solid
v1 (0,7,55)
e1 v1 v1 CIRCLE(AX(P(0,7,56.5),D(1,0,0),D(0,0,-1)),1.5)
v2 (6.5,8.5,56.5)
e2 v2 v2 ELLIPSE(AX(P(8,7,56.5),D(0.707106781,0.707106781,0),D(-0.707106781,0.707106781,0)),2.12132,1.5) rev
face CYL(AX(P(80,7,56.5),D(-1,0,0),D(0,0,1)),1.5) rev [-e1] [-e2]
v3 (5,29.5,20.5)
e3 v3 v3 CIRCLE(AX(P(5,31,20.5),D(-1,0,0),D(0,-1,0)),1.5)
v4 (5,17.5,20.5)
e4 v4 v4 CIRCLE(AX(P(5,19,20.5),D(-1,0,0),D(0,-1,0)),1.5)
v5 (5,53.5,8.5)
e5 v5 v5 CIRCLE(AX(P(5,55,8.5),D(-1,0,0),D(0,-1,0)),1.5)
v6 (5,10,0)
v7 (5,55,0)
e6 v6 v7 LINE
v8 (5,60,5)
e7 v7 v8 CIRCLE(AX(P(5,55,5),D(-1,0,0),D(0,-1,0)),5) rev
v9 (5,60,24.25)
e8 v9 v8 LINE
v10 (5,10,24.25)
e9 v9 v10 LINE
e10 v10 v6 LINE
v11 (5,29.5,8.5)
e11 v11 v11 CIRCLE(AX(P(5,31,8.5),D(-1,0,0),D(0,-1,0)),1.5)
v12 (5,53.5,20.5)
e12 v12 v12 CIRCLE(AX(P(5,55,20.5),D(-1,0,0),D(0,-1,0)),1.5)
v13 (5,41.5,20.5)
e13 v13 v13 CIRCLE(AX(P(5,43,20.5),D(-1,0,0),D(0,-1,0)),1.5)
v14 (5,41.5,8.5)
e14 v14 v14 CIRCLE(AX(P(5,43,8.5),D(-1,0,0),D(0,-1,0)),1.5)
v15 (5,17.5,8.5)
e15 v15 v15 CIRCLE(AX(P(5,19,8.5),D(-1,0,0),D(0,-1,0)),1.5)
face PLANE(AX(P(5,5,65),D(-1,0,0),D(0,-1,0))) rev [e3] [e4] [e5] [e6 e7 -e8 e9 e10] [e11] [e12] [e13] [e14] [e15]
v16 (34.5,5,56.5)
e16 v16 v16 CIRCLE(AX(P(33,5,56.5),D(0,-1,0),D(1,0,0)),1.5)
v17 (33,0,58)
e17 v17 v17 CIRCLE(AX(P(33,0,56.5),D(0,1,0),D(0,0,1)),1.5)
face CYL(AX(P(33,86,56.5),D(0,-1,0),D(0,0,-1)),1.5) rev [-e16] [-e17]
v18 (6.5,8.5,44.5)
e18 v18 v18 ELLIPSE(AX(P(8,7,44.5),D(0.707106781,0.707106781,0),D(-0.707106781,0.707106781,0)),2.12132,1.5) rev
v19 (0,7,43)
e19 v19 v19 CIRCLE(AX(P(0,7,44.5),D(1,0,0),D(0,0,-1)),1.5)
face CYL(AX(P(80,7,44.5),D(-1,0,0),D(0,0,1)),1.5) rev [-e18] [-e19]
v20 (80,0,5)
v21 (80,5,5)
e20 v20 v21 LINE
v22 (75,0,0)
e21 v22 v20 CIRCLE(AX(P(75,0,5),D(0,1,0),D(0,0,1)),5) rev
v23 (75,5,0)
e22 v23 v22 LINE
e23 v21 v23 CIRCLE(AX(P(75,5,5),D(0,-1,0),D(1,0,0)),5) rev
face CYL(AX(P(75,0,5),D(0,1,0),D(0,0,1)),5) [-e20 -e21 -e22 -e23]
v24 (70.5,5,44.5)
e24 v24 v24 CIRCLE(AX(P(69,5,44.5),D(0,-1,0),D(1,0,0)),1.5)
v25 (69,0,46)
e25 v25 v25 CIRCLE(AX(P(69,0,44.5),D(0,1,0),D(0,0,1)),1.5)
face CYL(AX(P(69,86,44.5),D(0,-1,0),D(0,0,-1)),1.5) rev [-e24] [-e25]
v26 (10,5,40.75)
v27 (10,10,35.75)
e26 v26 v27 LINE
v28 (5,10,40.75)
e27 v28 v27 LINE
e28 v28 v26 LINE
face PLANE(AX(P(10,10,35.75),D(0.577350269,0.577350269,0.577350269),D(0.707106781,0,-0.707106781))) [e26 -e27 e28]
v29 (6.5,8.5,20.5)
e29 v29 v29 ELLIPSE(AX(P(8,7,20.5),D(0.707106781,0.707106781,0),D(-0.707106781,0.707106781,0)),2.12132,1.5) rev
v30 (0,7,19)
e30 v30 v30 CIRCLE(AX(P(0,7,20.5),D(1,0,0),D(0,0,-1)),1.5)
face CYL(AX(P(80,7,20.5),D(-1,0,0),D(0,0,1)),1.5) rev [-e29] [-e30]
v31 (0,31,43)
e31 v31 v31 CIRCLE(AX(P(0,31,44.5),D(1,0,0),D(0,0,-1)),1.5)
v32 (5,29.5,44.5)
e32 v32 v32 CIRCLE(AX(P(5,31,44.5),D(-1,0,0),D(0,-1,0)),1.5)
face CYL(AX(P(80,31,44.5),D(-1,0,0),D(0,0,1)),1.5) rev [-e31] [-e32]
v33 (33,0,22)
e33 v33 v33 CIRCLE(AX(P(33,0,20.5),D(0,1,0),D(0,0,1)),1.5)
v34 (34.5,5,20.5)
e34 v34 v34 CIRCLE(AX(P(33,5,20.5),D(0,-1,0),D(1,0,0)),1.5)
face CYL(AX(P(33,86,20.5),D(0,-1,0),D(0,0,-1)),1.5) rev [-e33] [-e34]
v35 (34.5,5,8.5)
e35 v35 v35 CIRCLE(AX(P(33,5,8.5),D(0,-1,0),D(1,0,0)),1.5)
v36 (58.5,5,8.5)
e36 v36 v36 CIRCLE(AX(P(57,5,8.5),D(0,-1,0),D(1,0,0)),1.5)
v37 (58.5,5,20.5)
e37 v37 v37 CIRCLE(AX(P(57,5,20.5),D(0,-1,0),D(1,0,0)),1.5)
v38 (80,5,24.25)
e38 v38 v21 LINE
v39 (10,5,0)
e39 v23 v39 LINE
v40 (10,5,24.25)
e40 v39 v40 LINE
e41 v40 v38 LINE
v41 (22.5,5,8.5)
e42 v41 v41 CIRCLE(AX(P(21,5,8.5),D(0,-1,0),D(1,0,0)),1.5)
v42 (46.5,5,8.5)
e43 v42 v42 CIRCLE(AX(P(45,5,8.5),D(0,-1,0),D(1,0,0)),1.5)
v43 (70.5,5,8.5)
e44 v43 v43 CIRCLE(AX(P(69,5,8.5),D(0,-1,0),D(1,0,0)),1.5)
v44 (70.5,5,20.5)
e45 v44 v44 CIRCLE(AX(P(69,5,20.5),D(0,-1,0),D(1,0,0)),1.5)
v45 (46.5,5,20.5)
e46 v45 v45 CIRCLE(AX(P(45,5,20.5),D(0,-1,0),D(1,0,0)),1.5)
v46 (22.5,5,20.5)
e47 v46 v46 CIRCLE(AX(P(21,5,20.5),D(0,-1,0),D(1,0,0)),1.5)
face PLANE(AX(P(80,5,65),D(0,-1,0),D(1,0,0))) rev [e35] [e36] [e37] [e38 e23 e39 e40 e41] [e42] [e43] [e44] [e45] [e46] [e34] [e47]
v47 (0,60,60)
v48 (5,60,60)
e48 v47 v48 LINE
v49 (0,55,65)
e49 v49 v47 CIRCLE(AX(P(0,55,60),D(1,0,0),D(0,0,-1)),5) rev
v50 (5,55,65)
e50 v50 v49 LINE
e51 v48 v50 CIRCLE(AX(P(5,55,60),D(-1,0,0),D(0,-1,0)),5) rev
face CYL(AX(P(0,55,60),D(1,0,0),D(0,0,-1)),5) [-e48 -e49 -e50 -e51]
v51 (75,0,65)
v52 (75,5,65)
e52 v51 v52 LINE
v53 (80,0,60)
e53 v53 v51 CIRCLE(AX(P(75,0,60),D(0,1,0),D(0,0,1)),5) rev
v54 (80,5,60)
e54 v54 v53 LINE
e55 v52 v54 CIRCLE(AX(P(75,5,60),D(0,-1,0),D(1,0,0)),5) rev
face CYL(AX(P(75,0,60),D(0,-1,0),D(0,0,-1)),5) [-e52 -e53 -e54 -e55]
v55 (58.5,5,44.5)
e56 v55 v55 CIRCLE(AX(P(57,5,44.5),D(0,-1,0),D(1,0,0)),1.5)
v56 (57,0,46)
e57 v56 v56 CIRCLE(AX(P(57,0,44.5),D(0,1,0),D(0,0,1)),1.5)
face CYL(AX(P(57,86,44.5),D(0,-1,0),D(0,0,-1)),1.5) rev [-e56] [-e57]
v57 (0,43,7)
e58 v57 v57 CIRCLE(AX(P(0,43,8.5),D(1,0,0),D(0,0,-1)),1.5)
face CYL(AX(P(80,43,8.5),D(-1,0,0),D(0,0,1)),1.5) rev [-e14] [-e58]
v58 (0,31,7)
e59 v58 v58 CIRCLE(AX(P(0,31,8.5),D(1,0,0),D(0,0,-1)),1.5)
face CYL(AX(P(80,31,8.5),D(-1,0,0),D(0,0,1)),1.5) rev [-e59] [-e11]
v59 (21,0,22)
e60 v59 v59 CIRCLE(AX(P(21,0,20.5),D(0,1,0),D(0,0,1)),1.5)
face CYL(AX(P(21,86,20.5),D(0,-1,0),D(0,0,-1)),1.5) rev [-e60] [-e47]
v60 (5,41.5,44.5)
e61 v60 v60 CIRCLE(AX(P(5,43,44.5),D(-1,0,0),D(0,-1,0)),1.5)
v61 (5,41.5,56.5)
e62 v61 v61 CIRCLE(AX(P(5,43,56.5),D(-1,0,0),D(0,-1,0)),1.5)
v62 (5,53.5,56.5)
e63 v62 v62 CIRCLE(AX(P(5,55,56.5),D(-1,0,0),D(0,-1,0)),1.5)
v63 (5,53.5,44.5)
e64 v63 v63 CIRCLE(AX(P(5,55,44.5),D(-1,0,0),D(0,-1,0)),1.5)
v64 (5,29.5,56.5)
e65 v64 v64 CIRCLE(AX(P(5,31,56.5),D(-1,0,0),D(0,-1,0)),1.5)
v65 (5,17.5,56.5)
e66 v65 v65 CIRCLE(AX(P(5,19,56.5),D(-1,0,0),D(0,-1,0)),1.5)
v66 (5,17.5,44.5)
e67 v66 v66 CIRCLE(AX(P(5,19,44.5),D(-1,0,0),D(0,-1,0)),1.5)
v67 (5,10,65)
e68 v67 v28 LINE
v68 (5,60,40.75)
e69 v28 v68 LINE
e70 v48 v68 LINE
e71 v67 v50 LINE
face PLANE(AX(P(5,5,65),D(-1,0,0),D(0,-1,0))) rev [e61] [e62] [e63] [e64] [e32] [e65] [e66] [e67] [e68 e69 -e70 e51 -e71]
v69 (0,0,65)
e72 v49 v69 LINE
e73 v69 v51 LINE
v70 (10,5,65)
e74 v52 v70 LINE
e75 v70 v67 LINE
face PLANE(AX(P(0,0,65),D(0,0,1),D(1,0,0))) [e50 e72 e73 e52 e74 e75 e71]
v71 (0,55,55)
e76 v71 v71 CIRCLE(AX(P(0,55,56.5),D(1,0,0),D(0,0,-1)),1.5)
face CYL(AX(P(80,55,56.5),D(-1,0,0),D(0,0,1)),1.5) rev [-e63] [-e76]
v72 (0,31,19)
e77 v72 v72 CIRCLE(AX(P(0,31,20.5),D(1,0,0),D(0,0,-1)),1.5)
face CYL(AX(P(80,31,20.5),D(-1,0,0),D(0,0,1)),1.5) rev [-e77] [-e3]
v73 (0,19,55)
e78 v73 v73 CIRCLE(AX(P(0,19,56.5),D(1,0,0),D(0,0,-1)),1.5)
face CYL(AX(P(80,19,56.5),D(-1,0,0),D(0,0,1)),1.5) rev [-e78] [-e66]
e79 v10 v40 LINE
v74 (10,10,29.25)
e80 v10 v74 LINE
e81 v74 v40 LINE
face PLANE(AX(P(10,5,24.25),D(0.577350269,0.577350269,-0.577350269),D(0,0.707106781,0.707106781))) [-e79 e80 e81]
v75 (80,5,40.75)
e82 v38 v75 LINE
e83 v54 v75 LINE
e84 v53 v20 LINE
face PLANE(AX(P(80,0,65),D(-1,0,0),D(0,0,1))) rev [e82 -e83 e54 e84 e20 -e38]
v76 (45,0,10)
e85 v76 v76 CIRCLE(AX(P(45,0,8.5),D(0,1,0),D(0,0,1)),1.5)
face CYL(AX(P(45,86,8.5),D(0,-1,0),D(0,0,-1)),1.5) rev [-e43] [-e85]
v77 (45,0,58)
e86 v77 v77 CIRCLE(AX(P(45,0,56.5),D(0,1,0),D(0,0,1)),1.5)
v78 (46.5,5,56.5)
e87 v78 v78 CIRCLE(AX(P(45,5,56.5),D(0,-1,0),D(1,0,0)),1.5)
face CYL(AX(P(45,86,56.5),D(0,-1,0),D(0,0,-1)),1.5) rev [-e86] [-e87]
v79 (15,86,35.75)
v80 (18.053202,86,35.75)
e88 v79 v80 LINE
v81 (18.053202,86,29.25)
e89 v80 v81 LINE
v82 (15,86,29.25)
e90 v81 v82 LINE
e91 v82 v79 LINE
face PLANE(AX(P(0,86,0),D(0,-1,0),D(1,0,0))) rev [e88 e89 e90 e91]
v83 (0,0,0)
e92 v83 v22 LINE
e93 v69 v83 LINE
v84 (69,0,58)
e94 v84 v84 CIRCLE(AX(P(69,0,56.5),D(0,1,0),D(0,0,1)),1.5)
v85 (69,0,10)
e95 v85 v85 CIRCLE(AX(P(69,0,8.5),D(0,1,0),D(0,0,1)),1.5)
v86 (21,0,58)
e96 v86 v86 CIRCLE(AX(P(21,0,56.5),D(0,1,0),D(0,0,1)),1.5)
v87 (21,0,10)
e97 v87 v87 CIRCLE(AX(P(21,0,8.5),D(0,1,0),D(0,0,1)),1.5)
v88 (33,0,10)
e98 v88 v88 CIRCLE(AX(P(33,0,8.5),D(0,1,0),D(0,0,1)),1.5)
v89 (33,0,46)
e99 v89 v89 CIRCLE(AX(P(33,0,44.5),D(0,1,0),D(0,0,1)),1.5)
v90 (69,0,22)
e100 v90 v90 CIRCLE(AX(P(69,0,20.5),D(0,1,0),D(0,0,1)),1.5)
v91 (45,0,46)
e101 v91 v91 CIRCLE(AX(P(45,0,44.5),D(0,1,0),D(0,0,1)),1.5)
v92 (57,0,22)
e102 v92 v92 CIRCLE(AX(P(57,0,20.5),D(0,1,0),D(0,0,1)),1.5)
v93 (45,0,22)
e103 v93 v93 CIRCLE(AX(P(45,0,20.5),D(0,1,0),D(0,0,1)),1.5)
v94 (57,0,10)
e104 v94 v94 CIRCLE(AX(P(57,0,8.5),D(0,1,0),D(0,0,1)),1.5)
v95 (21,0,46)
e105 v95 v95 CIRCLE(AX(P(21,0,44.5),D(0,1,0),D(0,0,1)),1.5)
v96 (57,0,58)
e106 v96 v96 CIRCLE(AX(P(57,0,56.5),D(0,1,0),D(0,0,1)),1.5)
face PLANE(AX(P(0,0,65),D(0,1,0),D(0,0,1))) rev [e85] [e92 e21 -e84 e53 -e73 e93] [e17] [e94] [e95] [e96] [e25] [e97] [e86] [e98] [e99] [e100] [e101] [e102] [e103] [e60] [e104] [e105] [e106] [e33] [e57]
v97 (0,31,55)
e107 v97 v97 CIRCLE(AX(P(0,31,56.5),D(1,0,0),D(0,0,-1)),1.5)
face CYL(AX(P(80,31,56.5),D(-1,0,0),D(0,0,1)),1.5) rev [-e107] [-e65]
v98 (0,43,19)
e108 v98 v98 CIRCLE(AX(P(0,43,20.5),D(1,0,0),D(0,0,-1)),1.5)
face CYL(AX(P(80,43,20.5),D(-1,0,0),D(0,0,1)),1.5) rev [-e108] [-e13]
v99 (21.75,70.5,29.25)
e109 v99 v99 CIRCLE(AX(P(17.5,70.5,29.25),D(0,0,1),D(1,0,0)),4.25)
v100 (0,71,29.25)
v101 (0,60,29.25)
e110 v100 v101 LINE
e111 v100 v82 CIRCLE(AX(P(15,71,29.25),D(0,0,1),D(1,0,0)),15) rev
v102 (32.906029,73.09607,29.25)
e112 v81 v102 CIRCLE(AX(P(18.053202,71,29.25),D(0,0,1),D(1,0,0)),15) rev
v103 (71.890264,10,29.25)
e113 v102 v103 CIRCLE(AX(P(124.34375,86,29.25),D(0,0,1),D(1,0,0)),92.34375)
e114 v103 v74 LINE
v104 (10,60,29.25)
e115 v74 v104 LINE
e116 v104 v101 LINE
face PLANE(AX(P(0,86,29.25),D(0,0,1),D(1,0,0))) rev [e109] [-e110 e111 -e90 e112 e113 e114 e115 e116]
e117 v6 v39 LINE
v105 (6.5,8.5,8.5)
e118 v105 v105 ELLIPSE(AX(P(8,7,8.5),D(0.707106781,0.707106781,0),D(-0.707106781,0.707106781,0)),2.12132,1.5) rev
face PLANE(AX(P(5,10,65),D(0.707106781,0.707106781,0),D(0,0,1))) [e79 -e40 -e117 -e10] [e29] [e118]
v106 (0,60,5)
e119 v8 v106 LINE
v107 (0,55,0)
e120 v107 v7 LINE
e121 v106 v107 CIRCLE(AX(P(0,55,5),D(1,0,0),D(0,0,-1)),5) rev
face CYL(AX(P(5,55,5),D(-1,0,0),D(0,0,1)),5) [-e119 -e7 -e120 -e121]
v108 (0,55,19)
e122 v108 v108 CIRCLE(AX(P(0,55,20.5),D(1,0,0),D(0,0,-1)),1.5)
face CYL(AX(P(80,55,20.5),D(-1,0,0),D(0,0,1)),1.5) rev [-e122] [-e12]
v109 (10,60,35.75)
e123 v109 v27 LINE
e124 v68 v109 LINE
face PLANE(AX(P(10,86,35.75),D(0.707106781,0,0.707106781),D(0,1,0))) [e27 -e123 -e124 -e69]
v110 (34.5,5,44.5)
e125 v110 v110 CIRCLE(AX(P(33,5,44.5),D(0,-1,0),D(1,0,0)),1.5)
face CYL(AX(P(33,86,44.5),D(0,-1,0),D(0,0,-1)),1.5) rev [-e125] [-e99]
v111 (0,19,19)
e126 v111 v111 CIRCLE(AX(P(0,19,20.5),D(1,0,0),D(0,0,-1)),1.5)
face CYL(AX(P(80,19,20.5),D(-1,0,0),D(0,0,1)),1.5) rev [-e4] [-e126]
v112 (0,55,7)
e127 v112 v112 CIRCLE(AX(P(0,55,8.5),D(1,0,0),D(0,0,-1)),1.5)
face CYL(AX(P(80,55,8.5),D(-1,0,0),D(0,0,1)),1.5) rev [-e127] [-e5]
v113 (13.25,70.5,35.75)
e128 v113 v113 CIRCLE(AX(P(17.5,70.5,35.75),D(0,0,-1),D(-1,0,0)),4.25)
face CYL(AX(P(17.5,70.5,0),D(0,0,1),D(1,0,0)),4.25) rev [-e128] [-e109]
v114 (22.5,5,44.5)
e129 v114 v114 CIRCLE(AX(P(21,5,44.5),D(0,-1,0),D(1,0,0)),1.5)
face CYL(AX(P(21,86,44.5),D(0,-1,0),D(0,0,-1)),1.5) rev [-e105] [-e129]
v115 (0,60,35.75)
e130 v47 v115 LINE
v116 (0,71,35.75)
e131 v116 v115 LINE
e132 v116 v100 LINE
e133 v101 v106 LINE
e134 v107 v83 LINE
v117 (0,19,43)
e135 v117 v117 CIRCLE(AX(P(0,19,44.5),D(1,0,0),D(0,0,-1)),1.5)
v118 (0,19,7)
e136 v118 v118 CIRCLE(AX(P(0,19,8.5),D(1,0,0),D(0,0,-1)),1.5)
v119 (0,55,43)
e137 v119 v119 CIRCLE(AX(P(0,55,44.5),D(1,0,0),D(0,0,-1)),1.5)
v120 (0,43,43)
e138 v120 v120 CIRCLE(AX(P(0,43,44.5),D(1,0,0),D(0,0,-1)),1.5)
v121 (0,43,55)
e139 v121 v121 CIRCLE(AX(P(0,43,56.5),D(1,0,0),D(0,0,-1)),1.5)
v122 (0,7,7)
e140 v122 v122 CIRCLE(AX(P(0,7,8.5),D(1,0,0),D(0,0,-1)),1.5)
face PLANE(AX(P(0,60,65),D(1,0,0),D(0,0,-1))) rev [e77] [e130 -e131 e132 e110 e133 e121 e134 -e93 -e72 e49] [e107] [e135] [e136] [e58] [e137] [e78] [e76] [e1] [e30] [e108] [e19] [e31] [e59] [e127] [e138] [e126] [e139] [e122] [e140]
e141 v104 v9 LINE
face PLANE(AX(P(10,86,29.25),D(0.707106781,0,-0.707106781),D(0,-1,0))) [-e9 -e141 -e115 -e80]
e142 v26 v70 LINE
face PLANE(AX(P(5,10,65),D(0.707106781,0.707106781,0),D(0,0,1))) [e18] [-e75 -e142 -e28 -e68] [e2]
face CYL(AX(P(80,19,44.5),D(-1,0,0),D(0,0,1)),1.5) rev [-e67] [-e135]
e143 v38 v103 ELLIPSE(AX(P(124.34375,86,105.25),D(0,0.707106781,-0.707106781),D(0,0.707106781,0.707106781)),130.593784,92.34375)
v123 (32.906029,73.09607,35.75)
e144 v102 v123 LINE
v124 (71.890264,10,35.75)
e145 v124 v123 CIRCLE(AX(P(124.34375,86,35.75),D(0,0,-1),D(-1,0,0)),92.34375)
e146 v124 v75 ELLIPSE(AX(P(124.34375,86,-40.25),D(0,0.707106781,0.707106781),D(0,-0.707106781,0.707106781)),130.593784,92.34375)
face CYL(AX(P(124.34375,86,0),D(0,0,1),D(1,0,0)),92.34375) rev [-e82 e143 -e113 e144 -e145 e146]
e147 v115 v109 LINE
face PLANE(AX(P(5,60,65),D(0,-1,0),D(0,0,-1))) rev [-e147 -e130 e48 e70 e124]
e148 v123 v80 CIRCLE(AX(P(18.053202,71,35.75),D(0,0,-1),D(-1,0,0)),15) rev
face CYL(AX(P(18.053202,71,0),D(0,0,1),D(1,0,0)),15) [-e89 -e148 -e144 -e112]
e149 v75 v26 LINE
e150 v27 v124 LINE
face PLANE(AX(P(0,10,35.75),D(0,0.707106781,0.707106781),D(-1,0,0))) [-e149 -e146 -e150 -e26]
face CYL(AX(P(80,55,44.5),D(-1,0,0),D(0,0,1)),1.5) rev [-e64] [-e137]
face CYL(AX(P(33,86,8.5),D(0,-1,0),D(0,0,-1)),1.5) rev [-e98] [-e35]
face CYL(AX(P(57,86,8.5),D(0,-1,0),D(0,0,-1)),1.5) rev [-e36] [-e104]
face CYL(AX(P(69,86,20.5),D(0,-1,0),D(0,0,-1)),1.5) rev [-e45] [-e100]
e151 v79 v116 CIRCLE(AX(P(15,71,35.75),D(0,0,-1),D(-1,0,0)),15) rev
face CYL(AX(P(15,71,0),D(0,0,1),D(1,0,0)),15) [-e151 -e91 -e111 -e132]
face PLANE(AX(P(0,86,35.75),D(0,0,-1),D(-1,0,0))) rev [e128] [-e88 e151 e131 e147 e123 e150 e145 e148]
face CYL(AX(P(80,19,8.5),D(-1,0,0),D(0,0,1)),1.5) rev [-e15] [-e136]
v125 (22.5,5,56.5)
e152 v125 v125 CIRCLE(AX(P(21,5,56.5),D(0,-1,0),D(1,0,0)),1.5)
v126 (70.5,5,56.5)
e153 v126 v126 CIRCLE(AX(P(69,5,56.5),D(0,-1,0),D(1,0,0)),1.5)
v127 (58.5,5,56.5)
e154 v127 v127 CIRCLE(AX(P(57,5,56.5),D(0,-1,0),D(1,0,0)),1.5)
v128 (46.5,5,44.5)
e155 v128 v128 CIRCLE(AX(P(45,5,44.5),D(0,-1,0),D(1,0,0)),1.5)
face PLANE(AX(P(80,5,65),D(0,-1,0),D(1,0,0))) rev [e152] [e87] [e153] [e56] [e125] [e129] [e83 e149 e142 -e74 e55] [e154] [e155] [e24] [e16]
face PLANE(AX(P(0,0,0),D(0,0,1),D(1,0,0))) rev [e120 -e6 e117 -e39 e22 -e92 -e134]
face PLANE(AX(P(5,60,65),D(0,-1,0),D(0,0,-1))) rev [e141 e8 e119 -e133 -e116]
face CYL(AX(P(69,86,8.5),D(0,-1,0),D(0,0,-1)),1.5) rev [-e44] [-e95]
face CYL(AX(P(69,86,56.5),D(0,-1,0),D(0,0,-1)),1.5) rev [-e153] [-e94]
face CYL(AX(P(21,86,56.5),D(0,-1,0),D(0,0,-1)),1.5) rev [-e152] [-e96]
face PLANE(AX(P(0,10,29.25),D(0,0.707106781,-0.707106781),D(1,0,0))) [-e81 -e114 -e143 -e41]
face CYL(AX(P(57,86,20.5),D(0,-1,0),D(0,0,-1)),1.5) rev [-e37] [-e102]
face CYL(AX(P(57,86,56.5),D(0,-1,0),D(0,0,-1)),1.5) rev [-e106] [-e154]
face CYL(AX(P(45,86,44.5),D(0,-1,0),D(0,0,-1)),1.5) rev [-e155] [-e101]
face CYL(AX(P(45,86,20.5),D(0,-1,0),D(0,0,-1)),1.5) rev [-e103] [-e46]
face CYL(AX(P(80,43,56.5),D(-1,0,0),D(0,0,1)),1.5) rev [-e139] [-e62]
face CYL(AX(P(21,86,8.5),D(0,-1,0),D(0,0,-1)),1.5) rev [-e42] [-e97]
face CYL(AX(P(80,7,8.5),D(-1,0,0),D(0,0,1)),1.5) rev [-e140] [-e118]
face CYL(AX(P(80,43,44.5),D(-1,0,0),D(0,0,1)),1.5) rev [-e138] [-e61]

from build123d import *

# Parameters (mm, degrees)
BOSS_EXTRU_1_DEPTH           = 65
ESQUISSE2_W                  = 80
ESQUISSE2_H                  = 6.5
BOSS_EXTRU_2_DEPTH           = 81
ENL_V_MAT_EXTRU_1_DEPTH      = 123.776473724
ENL_V_MAT_EXTRU_1_DEPTH_BACK = 123.776473724
CONG_1_R                     = 15
ENL_V_MAT_EXTRU_2_DEPTH      = 123.776473724
ENL_V_MAT_EXTRU_2_DEPTH_BACK = 123.776473724
ESQUISSE4_R                  = 4.25
CHANFREIN1_SIZE              = 5
ENL_V_MAT_EXTRU_3_DEPTH      = 135.242318216
ENL_V_MAT_EXTRU_3_DEPTH_BACK = 135.242318216
ESQUISSE5_R                  = 1.5
CONG_2_R                     = 5
ENL_V_MAT_EXTRU_4_DEPTH      = 135.242318216
ENL_V_MAT_EXTRU_4_DEPTH_BACK = 135.242318216
ESQUISSE6_R                  = 1.5


with BuildPart() as part:
    # Esquisse1 → Boss.-Extru.1 (new body)
    with BuildSketch(Plane.XY):
        Polygon((0, 0), (80, 0), (80, 5), (5, 5), (5, 60), (0, 60), align=None)
    extrude(amount=BOSS_EXTRU_1_DEPTH)

    # Esquisse2 → Boss.-Extru.2 (add)
    with BuildSketch(Plane(origin=(0, 5, 0), x_dir=(1, 0, 0), z_dir=(0, 1, 0))):
        with Locations((40, -32.5)):
            Rectangle(ESQUISSE2_W, ESQUISSE2_H)
    extrude(amount=BOSS_EXTRU_2_DEPTH)

    # Esquisse3 → Enlèv. mat.-Extru.1 (cut, two sides: drawn at the far end of the back side and taken through both)
    with BuildSketch(Plane.XY.offset(35.75).offset(-ENL_V_MAT_EXTRU_1_DEPTH_BACK)):
        with BuildLine():
            Line((32, 86), (80, 86))
            Line((80, 86), (80, 5))
            ThreePointArc((80, 5), (44.901203691, 38.922935521), (32, 86))
        make_face()
    extrude(amount=ENL_V_MAT_EXTRU_1_DEPTH + ENL_V_MAT_EXTRU_1_DEPTH_BACK, mode=Mode.SUBTRACT)

    # Congé1
    cong_1_edges = [part.edges().sort_by_distance(p)[0] for p in [
        (0, 86, 32.5),
        (32, 86, 32.5),
    ]]
    fillet(cong_1_edges, radius=CONG_1_R)

    # Esquisse4 → Enlèv. mat.-Extru.2 (cut, two sides: drawn at the far end of the back side and taken through both)
    with BuildSketch(Plane.XY.offset(35.75).offset(-ENL_V_MAT_EXTRU_2_DEPTH_BACK)):
        with Locations((17.5, 70.5)):
            Circle(ESQUISSE4_R)
    extrude(amount=ENL_V_MAT_EXTRU_2_DEPTH + ENL_V_MAT_EXTRU_2_DEPTH_BACK, mode=Mode.SUBTRACT)

    # Chanfrein1
    # the kernel refuses this chamfer: 5 mm, written as the material it adds along each edge
    with BuildSketch(Plane(origin=(8.333333333, 8.333333333, 39.083333333), x_dir=(0, 0.7071067811865474, -0.7071067811865476), z_dir=(-0.5773502691896261, -0.5773502691896257, -0.5773502691896255))) as chanfrein1_piece_1_section:
        Polygon((-3.535533906, 2.041241452), (3.535533906, 2.041241452), (0, -4.082482905), align=None)
    chanfrein1_piece_1 = extrude(amount=6.350852961, mode=Mode.PRIVATE)
    chanfrein1_piece_1 = split(chanfrein1_piece_1, bisect_by=Plane(origin=(5, 5, 35.75), z_dir=(0, 1, 0)), keep=Keep.TOP, mode=Mode.PRIVATE)
    chanfrein1_piece_1 = split(chanfrein1_piece_1, bisect_by=Plane(origin=(5, 5, 35.75), z_dir=(0, 0, 1)), keep=Keep.TOP, mode=Mode.PRIVATE)
    chanfrein1_piece_1 = split(chanfrein1_piece_1, bisect_by=Plane(origin=(5, 5, 35.75), z_dir=(1, 0, 0)), keep=Keep.TOP, mode=Mode.PRIVATE)
    add(chanfrein1_piece_1)
    with BuildSketch(Plane(origin=(8.333333333, 8.333333333, 25.916666667), x_dir=(0, -0.7071067811865474, -0.7071067811865476), z_dir=(-0.577350269189626, -0.5773502691896256, 0.5773502691896257))) as chanfrein1_piece_2_section:
        Polygon((-3.535533906, 2.041241452), (3.535533906, 2.041241452), (0, -4.082482905), align=None)
    chanfrein1_piece_2 = extrude(amount=6.350852961, mode=Mode.PRIVATE)
    chanfrein1_piece_2 = split(chanfrein1_piece_2, bisect_by=Plane(origin=(5, 5, 29.25), z_dir=(0, 0, -1)), keep=Keep.TOP, mode=Mode.PRIVATE)
    chanfrein1_piece_2 = split(chanfrein1_piece_2, bisect_by=Plane(origin=(5, 5, 29.25), z_dir=(0, 1, 0)), keep=Keep.TOP, mode=Mode.PRIVATE)
    chanfrein1_piece_2 = split(chanfrein1_piece_2, bisect_by=Plane(origin=(5, 5, 29.25), z_dir=(1, 0, 0)), keep=Keep.TOP, mode=Mode.PRIVATE)
    add(chanfrein1_piece_2)
    with BuildSketch(Plane(origin=(5, 5, 22.89158506), x_dir=(-0.027495876610586324, 0.9996219169112968, 0), z_dir=(0, 0, 1))) as chanfrein1_piece_3:
        Polygon((CHANFREIN1_SIZE * 0.999621916911, -CHANFREIN1_SIZE * 0.0274958766106), (-CHANFREIN1_SIZE * 0.0274958766106, -CHANFREIN1_SIZE * 0.999621916911), (0, 0), align=None)
    extrude(amount=42.10841494)
    with BuildSketch(Plane(origin=(5, 5, 0), x_dir=(0.9996219169112968, -0.02749587661058617, 0), z_dir=(0, 0, 1))) as chanfrein1_piece_4:
        Polygon((CHANFREIN1_SIZE * 0.999621916911, CHANFREIN1_SIZE * 0.0274958766106), (-CHANFREIN1_SIZE * 0.0274958766106, CHANFREIN1_SIZE * 0.999621916911), (0, 0), align=None)
    extrude(amount=42.10841494)
    with BuildSketch(Plane(origin=(5, 5, 35.75), x_dir=(0.9996219169112968, 0, -0.027495876610586327), z_dir=(0, 1, 0)), Plane(origin=(5, 60, 29.25), x_dir=(0.9996219169112968, 0, 0.027495876610586313), z_dir=(0, -1, 0))) as chanfrein1_piece_5:
        Polygon((CHANFREIN1_SIZE * 0.999621916911, -CHANFREIN1_SIZE * 0.0274958766106), (-CHANFREIN1_SIZE * 0.0274958766106, -CHANFREIN1_SIZE * 0.999621916911), (0, 0), align=None)
    extrude(amount=55)
    with BuildSketch(Plane(origin=(92.85841494, 5, 35.75), x_dir=(0, 0.9996219169112968, -0.027495876610586327), z_dir=(-1, 0, 0))) as chanfrein1_piece_6_section:
        Polygon((CHANFREIN1_SIZE * 0.999621916911, -CHANFREIN1_SIZE * 0.0274958766106), (-CHANFREIN1_SIZE * 0.0274958766106, -CHANFREIN1_SIZE * 0.999621916911), (0, 0), align=None)
    chanfrein1_piece_6 = extrude(amount=87.85841494, mode=Mode.PRIVATE)
    chanfrein1_piece_6 = chanfrein1_piece_6 - Plane(origin=(124.34375, 86, 37.432610037), x_dir=(-0.4802030456852788, -0.8771573604060916, 0), z_dir=(0, 0, -1)) * Cylinder(92.34375, 196, mode=Mode.PRIVATE)
    add(chanfrein1_piece_6)
    with BuildSketch(Plane(origin=(5, 5, 29.25), x_dir=(0, 0.9996219169112968, 0.027495876610586324), z_dir=(1, 0, 0))) as chanfrein1_piece_7_section:
        Polygon((CHANFREIN1_SIZE * 0.999621916911, -CHANFREIN1_SIZE * 0.0274958766106), (-CHANFREIN1_SIZE * 0.0274958766106, -CHANFREIN1_SIZE * 0.999621916911), (0, 0), align=None)
    chanfrein1_piece_7 = extrude(amount=87.85841494, mode=Mode.PRIVATE)
    chanfrein1_piece_7 = chanfrein1_piece_7 - Plane(origin=(124.34375, 86, 27.567389963), x_dir=(-0.4802030456852788, -0.8771573604060916, 0), z_dir=(0, 0, -1)) * Cylinder(92.34375, 196, mode=Mode.PRIVATE)
    add(chanfrein1_piece_7)

    # Esquisse5 → Enlèv. mat.-Extru.3 (cut, two sides: drawn at the far end of the back side and taken through both)
    with BuildSketch(Plane.ZY.offset(-ENL_V_MAT_EXTRU_3_DEPTH_BACK)):
        with Locations(Location((8.5, 55, 0), (0, 0, 270))):
            Circle(ESQUISSE5_R)
        with Locations(Location((8.5, 43, 0), (0, 0, 270))):
            Circle(ESQUISSE5_R)
        with Locations(Location((8.5, 31, 0), (0, 0, 270))):
            Circle(ESQUISSE5_R)
        with Locations(Location((20.5, 31, 0), (0, 0, 270))):
            Circle(ESQUISSE5_R)
        with Locations(Location((20.5, 43, 0), (0, 0, 270))):
            Circle(ESQUISSE5_R)
        with Locations(Location((20.5, 55, 0), (0, 0, 270))):
            Circle(ESQUISSE5_R)
        with Locations(Location((20.5, 7, 0), (0, 0, 90))):
            Circle(ESQUISSE5_R)
        with Locations(Location((20.5, 19, 0), (0, 0, 270))):
            Circle(ESQUISSE5_R)
        with Locations(Location((8.5, 19, 0), (0, 0, 270))):
            Circle(ESQUISSE5_R)
        with Locations(Location((8.5, 7, 0), (0, 0, 90))):
            Circle(ESQUISSE5_R)
        with Locations(Location((56.5, 7, 0), (0, 0, 90))):
            Circle(ESQUISSE5_R)
        with Locations(Location((56.5, 19, 0), (0, 0, 270))):
            Circle(ESQUISSE5_R)
        with Locations(Location((44.5, 19, 0), (0, 0, 270))):
            Circle(ESQUISSE5_R)
        with Locations(Location((44.5, 7, 0), (0, 0, 90))):
            Circle(ESQUISSE5_R)
        with Locations(Location((44.5, 55, 0), (0, 0, 270))):
            Circle(ESQUISSE5_R)
        with Locations(Location((44.5, 43, 0), (0, 0, 270))):
            Circle(ESQUISSE5_R)
        with Locations(Location((44.5, 31, 0), (0, 0, 270))):
            Circle(ESQUISSE5_R)
        with Locations(Location((56.5, 31, 0), (0, 0, 270))):
            Circle(ESQUISSE5_R)
        with Locations(Location((56.5, 43, 0), (0, 0, 270))):
            Circle(ESQUISSE5_R)
        with Locations(Location((56.5, 55, 0), (0, 0, 270))):
            Circle(ESQUISSE5_R)
    extrude(amount=ENL_V_MAT_EXTRU_3_DEPTH + ENL_V_MAT_EXTRU_3_DEPTH_BACK, mode=Mode.SUBTRACT)

    # Congé2
    cong_2_edges = [part.edges().sort_by_distance(p)[0] for p in [
        (80, 2.5, 65),
        (2.5, 60, 65),
        (2.5, 60, 0),
        (80, 2.5, 0),
    ]]
    fillet(cong_2_edges, radius=CONG_2_R)

    # Esquisse6 → Enlèv. mat.-Extru.4 (cut, two sides: drawn at the far end of the back side and taken through both)
    with BuildSketch(Plane.XZ.offset(-ENL_V_MAT_EXTRU_4_DEPTH_BACK)):
        with Locations((45, 56.5)):
            Circle(ESQUISSE6_R)
        with Locations((57, 56.5)):
            Circle(ESQUISSE6_R)
        with Locations((69, 56.5)):
            Circle(ESQUISSE6_R)
        with Locations((21, 56.5)):
            Circle(ESQUISSE6_R)
        with Locations((33, 56.5)):
            Circle(ESQUISSE6_R)
        with Locations((33, 44.5)):
            Circle(ESQUISSE6_R)
        with Locations((21, 44.5)):
            Circle(ESQUISSE6_R)
        with Locations((69, 44.5)):
            Circle(ESQUISSE6_R)
        with Locations((57, 44.5)):
            Circle(ESQUISSE6_R)
        with Locations((45, 44.5)):
            Circle(ESQUISSE6_R)
        with Locations((45, 20.5)):
            Circle(ESQUISSE6_R)
        with Locations((57, 20.5)):
            Circle(ESQUISSE6_R)
        with Locations((69, 20.5)):
            Circle(ESQUISSE6_R)
        with Locations((21, 20.5)):
            Circle(ESQUISSE6_R)
        with Locations((33, 20.5)):
            Circle(ESQUISSE6_R)
        with Locations((33, 8.5)):
            Circle(ESQUISSE6_R)
        with Locations((21, 8.5)):
            Circle(ESQUISSE6_R)
        with Locations((69, 8.5)):
            Circle(ESQUISSE6_R)
        with Locations((57, 8.5)):
            Circle(ESQUISSE6_R)
        with Locations((45, 8.5)):
            Circle(ESQUISSE6_R)
    extrude(amount=ENL_V_MAT_EXTRU_4_DEPTH + ENL_V_MAT_EXTRU_4_DEPTH_BACK, mode=Mode.SUBTRACT)


solid = part.part
